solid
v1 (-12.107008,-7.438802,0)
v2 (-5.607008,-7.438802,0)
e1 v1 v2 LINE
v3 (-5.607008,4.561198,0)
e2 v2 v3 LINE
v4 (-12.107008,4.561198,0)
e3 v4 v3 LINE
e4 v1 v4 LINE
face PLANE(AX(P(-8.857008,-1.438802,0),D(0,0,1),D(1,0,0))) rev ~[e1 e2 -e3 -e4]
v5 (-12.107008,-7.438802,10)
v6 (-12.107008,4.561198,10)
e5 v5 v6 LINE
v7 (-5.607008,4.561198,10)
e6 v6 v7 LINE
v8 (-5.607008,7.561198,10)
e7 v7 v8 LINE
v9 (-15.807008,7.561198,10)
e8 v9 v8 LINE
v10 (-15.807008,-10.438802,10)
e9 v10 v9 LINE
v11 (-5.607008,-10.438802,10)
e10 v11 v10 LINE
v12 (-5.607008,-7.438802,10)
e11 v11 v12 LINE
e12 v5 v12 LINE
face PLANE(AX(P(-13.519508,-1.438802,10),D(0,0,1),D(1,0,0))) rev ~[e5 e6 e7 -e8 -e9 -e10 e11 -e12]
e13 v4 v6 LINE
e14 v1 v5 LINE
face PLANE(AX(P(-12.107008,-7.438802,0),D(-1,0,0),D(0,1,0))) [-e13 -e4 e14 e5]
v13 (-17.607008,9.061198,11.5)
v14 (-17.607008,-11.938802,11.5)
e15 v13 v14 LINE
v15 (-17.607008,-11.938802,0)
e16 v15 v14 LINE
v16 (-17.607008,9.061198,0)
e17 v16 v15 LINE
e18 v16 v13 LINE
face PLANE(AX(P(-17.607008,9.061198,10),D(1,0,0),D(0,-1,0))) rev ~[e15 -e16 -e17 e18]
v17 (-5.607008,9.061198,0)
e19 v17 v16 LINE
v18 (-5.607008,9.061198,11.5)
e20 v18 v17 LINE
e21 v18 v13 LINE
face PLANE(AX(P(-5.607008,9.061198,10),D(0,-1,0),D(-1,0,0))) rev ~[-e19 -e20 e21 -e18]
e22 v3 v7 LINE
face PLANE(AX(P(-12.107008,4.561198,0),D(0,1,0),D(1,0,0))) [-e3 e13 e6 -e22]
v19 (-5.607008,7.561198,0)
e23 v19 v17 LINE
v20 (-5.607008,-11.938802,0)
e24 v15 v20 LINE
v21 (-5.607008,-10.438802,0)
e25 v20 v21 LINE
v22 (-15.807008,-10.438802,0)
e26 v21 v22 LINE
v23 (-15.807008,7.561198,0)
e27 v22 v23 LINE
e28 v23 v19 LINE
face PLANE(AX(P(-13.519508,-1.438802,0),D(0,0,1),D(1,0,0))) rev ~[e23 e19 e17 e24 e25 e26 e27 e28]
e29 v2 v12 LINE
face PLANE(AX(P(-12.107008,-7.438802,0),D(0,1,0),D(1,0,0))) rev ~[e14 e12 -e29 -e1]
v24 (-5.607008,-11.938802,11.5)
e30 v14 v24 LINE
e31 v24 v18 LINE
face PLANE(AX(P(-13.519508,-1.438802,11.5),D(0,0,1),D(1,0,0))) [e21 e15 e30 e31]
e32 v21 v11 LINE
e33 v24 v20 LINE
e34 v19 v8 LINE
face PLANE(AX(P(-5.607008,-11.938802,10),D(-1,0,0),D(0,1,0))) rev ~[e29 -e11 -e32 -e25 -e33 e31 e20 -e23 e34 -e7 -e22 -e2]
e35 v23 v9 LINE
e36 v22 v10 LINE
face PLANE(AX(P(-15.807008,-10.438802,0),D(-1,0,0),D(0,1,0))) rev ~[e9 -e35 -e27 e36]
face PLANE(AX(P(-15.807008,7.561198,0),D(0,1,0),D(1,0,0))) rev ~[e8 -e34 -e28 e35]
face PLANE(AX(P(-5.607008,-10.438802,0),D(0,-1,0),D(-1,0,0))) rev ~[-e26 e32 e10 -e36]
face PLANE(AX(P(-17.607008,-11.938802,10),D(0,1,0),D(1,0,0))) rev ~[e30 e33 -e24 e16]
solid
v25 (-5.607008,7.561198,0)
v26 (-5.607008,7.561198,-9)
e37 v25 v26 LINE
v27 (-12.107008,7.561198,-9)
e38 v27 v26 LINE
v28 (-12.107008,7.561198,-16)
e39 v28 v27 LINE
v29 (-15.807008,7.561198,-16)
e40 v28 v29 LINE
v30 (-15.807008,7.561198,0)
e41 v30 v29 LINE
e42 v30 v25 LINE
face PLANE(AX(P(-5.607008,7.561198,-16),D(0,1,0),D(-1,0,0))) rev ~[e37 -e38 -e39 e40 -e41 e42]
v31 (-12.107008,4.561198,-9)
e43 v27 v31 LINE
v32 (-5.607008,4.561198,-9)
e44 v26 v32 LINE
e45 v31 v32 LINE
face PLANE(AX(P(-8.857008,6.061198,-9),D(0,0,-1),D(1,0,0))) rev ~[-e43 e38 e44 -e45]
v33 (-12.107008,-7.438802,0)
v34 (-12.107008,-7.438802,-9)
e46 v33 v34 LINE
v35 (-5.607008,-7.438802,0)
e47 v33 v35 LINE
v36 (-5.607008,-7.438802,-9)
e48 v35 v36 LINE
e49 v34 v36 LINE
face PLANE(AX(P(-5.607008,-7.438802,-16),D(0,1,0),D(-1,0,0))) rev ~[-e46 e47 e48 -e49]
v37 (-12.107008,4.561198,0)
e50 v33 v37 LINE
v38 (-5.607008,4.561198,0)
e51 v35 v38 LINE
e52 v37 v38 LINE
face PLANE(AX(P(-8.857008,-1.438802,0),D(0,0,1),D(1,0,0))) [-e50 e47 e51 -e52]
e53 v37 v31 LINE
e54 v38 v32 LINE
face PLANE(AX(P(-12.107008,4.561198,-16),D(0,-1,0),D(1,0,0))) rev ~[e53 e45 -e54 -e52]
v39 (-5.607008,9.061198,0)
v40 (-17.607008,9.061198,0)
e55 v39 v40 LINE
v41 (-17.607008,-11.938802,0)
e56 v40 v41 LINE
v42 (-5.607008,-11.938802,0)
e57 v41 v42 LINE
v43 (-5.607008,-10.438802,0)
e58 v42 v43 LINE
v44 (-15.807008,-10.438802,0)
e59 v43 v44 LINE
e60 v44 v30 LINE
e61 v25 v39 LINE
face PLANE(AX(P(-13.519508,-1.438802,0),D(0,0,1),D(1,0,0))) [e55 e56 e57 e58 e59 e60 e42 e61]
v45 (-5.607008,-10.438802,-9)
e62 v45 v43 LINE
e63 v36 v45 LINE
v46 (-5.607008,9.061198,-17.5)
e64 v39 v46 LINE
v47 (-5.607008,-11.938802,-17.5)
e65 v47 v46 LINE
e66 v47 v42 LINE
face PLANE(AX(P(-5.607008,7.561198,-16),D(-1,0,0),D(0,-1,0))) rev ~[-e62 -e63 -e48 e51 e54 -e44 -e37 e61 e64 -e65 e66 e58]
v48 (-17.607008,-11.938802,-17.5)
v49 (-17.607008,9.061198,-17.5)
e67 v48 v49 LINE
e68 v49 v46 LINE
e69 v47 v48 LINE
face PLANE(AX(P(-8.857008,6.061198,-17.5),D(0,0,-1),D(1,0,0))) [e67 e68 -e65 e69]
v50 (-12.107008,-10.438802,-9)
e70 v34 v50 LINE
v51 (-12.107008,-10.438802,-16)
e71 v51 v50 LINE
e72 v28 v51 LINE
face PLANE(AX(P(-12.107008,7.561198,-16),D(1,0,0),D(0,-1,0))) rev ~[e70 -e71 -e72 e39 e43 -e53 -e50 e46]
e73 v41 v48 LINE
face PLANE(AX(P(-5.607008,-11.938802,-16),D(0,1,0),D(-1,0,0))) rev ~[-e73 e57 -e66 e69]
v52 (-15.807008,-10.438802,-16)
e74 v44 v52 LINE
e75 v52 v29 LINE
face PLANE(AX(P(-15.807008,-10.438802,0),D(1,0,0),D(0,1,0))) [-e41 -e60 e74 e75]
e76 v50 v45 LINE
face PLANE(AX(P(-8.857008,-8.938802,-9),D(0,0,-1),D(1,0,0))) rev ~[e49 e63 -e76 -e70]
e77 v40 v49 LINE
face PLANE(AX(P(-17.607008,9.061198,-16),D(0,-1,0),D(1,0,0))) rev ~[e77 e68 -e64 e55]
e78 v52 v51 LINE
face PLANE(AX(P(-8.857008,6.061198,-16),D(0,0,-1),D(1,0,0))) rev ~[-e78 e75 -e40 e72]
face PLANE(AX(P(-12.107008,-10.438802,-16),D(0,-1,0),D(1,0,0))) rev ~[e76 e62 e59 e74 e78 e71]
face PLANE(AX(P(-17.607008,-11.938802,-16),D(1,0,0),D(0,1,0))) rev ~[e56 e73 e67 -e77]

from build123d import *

# Parameters (mm, degrees)
F1_DEPTH = 10
F0_W     = 6.5
F0_H     = 12
F2_W     = 10.2
F2_H     = 18
F3_DEPTH = 1.5
F4_DEPTH = 16
F6_DEPTH = 1.5
F5_W     = 6.5
F5_H     = 3
F7_DEPTH = 1.5
F8_DEPTH = 7


# Not quite as in the source:
# - a feature names something its author has since deleted; it is built from what else it names


with BuildPart() as f1:
    # F0 (on Top) → F1 (new body)
    with BuildSketch(Plane.XY):
        Polygon((-5.6070076972, 9.0611978821), (-17.6070076972, 9.0611978821), (-17.6070076972, -11.9388021179), (-5.6070076972, -11.9388021179), (-5.6070076972, -10.4388021179), (-15.8070076972, -10.4388021179), (-15.8070076972, 7.5611978821), (-5.6070076972, 7.5611978821), align=None)
    extrude(amount=F1_DEPTH)



with BuildPart() as f1b:
    # F0 (on Top) → F1, piece 2 (new body)
    with BuildSketch(Plane.XY):
        with Locations((-8.8570076972, -1.4388021179)):
            Rectangle(F0_W, F0_H)
    extrude(amount=F1_DEPTH)


with BuildPart() as f1_1:
    add(f1.part)

    add(f1b.part)  # F3 merges F1b
    # F2 (on face) → F3 (join)
    with BuildSketch(Plane.XY.offset(10)):
        Polygon((-5.6070076972, 9.0611978821), (-17.6070076972, 9.0611978821), (-17.6070076972, -11.9388021179), (-5.6070076972, -11.9388021179), (-5.6070076972, -10.4388021179), (-15.8070076972, -10.4388021179), (-15.8070076972, 7.5611978821), (-5.6070076972, 7.5611978821), align=None)
        with Locations((-10.7070076972, -1.4388021179)):
            Rectangle(F2_W, F2_H)
    extrude(amount=F3_DEPTH)


with BuildPart() as f4:
    # F0 (on Top) → F4 (new body)
    with BuildSketch(Plane.XY):
        Polygon((-5.6070076972, 9.0611978821), (-17.6070076972, 9.0611978821), (-17.6070076972, -11.9388021179), (-5.6070076972, -11.9388021179), (-5.6070076972, -10.4388021179), (-15.8070076972, -10.4388021179), (-15.8070076972, 7.5611978821), (-5.6070076972, 7.5611978821), align=None)
    extrude(amount=-F4_DEPTH)



with BuildPart() as f4b:
    # F0 (on Top) → F4, piece 2 (new body)
    with BuildSketch(Plane.XY):
        with Locations((-8.8570076972, -1.4388021179)):
            Rectangle(F0_W, F0_H)
    extrude(amount=-F4_DEPTH)


with BuildPart() as f4_1:
    add(f4.part)

    add(f4b.part)  # F6 merges F4b
    # F5 (on face) → F6 (join)
    with BuildSketch(Plane(origin=(0, 0, -16), x_dir=(1, 0, 0), z_dir=(0, 0, -1))):
        Polygon((-5.6070076972, 11.9388021179), (-17.6070076972, 11.9388021179), (-17.6070076972, -9.0611978821), (-5.6070076972, -9.0611978821), (-5.6070076972, -7.5611978821), (-12.1070076972, -7.5611978821), (-15.8070076972, -7.5611978821), (-15.8070076972, 10.4388021179), (-12.1070076972, 10.4388021179), (-5.6070076972, 10.4388021179), align=None)
        Polygon((-5.6070076972, -4.5611978821), (-5.6070076972, 7.4388021179), (-12.1070076972, 7.4388021179), (-12.1070076972, 10.4388021179), (-15.8070076972, 10.4388021179), (-15.8070076972, -7.5611978821), (-12.1070076972, -7.5611978821), (-12.1070076972, -4.5611978821), align=None)
    extrude(amount=F6_DEPTH)

    # F5 (on face) → F7 (join)
    with BuildSketch(Plane(origin=(0, 0, -16), x_dir=(1, 0, 0), z_dir=(0, 0, -1))):
        with Locations((-8.8570076972, -6.0611978821)):
            Rectangle(F5_W, F5_H)
        with Locations((-8.8570076972, 8.9388021179)):
            Rectangle(F5_W, F5_H)
    extrude(amount=F7_DEPTH)

    # F5 (on face) → F8 (join)
    with BuildSketch(Plane(origin=(0, 0, -16), x_dir=(1, 0, 0), z_dir=(0, 0, -1))):
        with Locations((-8.8570076972, -6.0611978821)):
            Rectangle(F5_W, F5_H)
        with Locations((-8.8570076972, 8.9388021179)):
            Rectangle(F5_W, F5_H)
    extrude(amount=-F8_DEPTH)


solid = Compound([f1_1.part, f4_1.part])
